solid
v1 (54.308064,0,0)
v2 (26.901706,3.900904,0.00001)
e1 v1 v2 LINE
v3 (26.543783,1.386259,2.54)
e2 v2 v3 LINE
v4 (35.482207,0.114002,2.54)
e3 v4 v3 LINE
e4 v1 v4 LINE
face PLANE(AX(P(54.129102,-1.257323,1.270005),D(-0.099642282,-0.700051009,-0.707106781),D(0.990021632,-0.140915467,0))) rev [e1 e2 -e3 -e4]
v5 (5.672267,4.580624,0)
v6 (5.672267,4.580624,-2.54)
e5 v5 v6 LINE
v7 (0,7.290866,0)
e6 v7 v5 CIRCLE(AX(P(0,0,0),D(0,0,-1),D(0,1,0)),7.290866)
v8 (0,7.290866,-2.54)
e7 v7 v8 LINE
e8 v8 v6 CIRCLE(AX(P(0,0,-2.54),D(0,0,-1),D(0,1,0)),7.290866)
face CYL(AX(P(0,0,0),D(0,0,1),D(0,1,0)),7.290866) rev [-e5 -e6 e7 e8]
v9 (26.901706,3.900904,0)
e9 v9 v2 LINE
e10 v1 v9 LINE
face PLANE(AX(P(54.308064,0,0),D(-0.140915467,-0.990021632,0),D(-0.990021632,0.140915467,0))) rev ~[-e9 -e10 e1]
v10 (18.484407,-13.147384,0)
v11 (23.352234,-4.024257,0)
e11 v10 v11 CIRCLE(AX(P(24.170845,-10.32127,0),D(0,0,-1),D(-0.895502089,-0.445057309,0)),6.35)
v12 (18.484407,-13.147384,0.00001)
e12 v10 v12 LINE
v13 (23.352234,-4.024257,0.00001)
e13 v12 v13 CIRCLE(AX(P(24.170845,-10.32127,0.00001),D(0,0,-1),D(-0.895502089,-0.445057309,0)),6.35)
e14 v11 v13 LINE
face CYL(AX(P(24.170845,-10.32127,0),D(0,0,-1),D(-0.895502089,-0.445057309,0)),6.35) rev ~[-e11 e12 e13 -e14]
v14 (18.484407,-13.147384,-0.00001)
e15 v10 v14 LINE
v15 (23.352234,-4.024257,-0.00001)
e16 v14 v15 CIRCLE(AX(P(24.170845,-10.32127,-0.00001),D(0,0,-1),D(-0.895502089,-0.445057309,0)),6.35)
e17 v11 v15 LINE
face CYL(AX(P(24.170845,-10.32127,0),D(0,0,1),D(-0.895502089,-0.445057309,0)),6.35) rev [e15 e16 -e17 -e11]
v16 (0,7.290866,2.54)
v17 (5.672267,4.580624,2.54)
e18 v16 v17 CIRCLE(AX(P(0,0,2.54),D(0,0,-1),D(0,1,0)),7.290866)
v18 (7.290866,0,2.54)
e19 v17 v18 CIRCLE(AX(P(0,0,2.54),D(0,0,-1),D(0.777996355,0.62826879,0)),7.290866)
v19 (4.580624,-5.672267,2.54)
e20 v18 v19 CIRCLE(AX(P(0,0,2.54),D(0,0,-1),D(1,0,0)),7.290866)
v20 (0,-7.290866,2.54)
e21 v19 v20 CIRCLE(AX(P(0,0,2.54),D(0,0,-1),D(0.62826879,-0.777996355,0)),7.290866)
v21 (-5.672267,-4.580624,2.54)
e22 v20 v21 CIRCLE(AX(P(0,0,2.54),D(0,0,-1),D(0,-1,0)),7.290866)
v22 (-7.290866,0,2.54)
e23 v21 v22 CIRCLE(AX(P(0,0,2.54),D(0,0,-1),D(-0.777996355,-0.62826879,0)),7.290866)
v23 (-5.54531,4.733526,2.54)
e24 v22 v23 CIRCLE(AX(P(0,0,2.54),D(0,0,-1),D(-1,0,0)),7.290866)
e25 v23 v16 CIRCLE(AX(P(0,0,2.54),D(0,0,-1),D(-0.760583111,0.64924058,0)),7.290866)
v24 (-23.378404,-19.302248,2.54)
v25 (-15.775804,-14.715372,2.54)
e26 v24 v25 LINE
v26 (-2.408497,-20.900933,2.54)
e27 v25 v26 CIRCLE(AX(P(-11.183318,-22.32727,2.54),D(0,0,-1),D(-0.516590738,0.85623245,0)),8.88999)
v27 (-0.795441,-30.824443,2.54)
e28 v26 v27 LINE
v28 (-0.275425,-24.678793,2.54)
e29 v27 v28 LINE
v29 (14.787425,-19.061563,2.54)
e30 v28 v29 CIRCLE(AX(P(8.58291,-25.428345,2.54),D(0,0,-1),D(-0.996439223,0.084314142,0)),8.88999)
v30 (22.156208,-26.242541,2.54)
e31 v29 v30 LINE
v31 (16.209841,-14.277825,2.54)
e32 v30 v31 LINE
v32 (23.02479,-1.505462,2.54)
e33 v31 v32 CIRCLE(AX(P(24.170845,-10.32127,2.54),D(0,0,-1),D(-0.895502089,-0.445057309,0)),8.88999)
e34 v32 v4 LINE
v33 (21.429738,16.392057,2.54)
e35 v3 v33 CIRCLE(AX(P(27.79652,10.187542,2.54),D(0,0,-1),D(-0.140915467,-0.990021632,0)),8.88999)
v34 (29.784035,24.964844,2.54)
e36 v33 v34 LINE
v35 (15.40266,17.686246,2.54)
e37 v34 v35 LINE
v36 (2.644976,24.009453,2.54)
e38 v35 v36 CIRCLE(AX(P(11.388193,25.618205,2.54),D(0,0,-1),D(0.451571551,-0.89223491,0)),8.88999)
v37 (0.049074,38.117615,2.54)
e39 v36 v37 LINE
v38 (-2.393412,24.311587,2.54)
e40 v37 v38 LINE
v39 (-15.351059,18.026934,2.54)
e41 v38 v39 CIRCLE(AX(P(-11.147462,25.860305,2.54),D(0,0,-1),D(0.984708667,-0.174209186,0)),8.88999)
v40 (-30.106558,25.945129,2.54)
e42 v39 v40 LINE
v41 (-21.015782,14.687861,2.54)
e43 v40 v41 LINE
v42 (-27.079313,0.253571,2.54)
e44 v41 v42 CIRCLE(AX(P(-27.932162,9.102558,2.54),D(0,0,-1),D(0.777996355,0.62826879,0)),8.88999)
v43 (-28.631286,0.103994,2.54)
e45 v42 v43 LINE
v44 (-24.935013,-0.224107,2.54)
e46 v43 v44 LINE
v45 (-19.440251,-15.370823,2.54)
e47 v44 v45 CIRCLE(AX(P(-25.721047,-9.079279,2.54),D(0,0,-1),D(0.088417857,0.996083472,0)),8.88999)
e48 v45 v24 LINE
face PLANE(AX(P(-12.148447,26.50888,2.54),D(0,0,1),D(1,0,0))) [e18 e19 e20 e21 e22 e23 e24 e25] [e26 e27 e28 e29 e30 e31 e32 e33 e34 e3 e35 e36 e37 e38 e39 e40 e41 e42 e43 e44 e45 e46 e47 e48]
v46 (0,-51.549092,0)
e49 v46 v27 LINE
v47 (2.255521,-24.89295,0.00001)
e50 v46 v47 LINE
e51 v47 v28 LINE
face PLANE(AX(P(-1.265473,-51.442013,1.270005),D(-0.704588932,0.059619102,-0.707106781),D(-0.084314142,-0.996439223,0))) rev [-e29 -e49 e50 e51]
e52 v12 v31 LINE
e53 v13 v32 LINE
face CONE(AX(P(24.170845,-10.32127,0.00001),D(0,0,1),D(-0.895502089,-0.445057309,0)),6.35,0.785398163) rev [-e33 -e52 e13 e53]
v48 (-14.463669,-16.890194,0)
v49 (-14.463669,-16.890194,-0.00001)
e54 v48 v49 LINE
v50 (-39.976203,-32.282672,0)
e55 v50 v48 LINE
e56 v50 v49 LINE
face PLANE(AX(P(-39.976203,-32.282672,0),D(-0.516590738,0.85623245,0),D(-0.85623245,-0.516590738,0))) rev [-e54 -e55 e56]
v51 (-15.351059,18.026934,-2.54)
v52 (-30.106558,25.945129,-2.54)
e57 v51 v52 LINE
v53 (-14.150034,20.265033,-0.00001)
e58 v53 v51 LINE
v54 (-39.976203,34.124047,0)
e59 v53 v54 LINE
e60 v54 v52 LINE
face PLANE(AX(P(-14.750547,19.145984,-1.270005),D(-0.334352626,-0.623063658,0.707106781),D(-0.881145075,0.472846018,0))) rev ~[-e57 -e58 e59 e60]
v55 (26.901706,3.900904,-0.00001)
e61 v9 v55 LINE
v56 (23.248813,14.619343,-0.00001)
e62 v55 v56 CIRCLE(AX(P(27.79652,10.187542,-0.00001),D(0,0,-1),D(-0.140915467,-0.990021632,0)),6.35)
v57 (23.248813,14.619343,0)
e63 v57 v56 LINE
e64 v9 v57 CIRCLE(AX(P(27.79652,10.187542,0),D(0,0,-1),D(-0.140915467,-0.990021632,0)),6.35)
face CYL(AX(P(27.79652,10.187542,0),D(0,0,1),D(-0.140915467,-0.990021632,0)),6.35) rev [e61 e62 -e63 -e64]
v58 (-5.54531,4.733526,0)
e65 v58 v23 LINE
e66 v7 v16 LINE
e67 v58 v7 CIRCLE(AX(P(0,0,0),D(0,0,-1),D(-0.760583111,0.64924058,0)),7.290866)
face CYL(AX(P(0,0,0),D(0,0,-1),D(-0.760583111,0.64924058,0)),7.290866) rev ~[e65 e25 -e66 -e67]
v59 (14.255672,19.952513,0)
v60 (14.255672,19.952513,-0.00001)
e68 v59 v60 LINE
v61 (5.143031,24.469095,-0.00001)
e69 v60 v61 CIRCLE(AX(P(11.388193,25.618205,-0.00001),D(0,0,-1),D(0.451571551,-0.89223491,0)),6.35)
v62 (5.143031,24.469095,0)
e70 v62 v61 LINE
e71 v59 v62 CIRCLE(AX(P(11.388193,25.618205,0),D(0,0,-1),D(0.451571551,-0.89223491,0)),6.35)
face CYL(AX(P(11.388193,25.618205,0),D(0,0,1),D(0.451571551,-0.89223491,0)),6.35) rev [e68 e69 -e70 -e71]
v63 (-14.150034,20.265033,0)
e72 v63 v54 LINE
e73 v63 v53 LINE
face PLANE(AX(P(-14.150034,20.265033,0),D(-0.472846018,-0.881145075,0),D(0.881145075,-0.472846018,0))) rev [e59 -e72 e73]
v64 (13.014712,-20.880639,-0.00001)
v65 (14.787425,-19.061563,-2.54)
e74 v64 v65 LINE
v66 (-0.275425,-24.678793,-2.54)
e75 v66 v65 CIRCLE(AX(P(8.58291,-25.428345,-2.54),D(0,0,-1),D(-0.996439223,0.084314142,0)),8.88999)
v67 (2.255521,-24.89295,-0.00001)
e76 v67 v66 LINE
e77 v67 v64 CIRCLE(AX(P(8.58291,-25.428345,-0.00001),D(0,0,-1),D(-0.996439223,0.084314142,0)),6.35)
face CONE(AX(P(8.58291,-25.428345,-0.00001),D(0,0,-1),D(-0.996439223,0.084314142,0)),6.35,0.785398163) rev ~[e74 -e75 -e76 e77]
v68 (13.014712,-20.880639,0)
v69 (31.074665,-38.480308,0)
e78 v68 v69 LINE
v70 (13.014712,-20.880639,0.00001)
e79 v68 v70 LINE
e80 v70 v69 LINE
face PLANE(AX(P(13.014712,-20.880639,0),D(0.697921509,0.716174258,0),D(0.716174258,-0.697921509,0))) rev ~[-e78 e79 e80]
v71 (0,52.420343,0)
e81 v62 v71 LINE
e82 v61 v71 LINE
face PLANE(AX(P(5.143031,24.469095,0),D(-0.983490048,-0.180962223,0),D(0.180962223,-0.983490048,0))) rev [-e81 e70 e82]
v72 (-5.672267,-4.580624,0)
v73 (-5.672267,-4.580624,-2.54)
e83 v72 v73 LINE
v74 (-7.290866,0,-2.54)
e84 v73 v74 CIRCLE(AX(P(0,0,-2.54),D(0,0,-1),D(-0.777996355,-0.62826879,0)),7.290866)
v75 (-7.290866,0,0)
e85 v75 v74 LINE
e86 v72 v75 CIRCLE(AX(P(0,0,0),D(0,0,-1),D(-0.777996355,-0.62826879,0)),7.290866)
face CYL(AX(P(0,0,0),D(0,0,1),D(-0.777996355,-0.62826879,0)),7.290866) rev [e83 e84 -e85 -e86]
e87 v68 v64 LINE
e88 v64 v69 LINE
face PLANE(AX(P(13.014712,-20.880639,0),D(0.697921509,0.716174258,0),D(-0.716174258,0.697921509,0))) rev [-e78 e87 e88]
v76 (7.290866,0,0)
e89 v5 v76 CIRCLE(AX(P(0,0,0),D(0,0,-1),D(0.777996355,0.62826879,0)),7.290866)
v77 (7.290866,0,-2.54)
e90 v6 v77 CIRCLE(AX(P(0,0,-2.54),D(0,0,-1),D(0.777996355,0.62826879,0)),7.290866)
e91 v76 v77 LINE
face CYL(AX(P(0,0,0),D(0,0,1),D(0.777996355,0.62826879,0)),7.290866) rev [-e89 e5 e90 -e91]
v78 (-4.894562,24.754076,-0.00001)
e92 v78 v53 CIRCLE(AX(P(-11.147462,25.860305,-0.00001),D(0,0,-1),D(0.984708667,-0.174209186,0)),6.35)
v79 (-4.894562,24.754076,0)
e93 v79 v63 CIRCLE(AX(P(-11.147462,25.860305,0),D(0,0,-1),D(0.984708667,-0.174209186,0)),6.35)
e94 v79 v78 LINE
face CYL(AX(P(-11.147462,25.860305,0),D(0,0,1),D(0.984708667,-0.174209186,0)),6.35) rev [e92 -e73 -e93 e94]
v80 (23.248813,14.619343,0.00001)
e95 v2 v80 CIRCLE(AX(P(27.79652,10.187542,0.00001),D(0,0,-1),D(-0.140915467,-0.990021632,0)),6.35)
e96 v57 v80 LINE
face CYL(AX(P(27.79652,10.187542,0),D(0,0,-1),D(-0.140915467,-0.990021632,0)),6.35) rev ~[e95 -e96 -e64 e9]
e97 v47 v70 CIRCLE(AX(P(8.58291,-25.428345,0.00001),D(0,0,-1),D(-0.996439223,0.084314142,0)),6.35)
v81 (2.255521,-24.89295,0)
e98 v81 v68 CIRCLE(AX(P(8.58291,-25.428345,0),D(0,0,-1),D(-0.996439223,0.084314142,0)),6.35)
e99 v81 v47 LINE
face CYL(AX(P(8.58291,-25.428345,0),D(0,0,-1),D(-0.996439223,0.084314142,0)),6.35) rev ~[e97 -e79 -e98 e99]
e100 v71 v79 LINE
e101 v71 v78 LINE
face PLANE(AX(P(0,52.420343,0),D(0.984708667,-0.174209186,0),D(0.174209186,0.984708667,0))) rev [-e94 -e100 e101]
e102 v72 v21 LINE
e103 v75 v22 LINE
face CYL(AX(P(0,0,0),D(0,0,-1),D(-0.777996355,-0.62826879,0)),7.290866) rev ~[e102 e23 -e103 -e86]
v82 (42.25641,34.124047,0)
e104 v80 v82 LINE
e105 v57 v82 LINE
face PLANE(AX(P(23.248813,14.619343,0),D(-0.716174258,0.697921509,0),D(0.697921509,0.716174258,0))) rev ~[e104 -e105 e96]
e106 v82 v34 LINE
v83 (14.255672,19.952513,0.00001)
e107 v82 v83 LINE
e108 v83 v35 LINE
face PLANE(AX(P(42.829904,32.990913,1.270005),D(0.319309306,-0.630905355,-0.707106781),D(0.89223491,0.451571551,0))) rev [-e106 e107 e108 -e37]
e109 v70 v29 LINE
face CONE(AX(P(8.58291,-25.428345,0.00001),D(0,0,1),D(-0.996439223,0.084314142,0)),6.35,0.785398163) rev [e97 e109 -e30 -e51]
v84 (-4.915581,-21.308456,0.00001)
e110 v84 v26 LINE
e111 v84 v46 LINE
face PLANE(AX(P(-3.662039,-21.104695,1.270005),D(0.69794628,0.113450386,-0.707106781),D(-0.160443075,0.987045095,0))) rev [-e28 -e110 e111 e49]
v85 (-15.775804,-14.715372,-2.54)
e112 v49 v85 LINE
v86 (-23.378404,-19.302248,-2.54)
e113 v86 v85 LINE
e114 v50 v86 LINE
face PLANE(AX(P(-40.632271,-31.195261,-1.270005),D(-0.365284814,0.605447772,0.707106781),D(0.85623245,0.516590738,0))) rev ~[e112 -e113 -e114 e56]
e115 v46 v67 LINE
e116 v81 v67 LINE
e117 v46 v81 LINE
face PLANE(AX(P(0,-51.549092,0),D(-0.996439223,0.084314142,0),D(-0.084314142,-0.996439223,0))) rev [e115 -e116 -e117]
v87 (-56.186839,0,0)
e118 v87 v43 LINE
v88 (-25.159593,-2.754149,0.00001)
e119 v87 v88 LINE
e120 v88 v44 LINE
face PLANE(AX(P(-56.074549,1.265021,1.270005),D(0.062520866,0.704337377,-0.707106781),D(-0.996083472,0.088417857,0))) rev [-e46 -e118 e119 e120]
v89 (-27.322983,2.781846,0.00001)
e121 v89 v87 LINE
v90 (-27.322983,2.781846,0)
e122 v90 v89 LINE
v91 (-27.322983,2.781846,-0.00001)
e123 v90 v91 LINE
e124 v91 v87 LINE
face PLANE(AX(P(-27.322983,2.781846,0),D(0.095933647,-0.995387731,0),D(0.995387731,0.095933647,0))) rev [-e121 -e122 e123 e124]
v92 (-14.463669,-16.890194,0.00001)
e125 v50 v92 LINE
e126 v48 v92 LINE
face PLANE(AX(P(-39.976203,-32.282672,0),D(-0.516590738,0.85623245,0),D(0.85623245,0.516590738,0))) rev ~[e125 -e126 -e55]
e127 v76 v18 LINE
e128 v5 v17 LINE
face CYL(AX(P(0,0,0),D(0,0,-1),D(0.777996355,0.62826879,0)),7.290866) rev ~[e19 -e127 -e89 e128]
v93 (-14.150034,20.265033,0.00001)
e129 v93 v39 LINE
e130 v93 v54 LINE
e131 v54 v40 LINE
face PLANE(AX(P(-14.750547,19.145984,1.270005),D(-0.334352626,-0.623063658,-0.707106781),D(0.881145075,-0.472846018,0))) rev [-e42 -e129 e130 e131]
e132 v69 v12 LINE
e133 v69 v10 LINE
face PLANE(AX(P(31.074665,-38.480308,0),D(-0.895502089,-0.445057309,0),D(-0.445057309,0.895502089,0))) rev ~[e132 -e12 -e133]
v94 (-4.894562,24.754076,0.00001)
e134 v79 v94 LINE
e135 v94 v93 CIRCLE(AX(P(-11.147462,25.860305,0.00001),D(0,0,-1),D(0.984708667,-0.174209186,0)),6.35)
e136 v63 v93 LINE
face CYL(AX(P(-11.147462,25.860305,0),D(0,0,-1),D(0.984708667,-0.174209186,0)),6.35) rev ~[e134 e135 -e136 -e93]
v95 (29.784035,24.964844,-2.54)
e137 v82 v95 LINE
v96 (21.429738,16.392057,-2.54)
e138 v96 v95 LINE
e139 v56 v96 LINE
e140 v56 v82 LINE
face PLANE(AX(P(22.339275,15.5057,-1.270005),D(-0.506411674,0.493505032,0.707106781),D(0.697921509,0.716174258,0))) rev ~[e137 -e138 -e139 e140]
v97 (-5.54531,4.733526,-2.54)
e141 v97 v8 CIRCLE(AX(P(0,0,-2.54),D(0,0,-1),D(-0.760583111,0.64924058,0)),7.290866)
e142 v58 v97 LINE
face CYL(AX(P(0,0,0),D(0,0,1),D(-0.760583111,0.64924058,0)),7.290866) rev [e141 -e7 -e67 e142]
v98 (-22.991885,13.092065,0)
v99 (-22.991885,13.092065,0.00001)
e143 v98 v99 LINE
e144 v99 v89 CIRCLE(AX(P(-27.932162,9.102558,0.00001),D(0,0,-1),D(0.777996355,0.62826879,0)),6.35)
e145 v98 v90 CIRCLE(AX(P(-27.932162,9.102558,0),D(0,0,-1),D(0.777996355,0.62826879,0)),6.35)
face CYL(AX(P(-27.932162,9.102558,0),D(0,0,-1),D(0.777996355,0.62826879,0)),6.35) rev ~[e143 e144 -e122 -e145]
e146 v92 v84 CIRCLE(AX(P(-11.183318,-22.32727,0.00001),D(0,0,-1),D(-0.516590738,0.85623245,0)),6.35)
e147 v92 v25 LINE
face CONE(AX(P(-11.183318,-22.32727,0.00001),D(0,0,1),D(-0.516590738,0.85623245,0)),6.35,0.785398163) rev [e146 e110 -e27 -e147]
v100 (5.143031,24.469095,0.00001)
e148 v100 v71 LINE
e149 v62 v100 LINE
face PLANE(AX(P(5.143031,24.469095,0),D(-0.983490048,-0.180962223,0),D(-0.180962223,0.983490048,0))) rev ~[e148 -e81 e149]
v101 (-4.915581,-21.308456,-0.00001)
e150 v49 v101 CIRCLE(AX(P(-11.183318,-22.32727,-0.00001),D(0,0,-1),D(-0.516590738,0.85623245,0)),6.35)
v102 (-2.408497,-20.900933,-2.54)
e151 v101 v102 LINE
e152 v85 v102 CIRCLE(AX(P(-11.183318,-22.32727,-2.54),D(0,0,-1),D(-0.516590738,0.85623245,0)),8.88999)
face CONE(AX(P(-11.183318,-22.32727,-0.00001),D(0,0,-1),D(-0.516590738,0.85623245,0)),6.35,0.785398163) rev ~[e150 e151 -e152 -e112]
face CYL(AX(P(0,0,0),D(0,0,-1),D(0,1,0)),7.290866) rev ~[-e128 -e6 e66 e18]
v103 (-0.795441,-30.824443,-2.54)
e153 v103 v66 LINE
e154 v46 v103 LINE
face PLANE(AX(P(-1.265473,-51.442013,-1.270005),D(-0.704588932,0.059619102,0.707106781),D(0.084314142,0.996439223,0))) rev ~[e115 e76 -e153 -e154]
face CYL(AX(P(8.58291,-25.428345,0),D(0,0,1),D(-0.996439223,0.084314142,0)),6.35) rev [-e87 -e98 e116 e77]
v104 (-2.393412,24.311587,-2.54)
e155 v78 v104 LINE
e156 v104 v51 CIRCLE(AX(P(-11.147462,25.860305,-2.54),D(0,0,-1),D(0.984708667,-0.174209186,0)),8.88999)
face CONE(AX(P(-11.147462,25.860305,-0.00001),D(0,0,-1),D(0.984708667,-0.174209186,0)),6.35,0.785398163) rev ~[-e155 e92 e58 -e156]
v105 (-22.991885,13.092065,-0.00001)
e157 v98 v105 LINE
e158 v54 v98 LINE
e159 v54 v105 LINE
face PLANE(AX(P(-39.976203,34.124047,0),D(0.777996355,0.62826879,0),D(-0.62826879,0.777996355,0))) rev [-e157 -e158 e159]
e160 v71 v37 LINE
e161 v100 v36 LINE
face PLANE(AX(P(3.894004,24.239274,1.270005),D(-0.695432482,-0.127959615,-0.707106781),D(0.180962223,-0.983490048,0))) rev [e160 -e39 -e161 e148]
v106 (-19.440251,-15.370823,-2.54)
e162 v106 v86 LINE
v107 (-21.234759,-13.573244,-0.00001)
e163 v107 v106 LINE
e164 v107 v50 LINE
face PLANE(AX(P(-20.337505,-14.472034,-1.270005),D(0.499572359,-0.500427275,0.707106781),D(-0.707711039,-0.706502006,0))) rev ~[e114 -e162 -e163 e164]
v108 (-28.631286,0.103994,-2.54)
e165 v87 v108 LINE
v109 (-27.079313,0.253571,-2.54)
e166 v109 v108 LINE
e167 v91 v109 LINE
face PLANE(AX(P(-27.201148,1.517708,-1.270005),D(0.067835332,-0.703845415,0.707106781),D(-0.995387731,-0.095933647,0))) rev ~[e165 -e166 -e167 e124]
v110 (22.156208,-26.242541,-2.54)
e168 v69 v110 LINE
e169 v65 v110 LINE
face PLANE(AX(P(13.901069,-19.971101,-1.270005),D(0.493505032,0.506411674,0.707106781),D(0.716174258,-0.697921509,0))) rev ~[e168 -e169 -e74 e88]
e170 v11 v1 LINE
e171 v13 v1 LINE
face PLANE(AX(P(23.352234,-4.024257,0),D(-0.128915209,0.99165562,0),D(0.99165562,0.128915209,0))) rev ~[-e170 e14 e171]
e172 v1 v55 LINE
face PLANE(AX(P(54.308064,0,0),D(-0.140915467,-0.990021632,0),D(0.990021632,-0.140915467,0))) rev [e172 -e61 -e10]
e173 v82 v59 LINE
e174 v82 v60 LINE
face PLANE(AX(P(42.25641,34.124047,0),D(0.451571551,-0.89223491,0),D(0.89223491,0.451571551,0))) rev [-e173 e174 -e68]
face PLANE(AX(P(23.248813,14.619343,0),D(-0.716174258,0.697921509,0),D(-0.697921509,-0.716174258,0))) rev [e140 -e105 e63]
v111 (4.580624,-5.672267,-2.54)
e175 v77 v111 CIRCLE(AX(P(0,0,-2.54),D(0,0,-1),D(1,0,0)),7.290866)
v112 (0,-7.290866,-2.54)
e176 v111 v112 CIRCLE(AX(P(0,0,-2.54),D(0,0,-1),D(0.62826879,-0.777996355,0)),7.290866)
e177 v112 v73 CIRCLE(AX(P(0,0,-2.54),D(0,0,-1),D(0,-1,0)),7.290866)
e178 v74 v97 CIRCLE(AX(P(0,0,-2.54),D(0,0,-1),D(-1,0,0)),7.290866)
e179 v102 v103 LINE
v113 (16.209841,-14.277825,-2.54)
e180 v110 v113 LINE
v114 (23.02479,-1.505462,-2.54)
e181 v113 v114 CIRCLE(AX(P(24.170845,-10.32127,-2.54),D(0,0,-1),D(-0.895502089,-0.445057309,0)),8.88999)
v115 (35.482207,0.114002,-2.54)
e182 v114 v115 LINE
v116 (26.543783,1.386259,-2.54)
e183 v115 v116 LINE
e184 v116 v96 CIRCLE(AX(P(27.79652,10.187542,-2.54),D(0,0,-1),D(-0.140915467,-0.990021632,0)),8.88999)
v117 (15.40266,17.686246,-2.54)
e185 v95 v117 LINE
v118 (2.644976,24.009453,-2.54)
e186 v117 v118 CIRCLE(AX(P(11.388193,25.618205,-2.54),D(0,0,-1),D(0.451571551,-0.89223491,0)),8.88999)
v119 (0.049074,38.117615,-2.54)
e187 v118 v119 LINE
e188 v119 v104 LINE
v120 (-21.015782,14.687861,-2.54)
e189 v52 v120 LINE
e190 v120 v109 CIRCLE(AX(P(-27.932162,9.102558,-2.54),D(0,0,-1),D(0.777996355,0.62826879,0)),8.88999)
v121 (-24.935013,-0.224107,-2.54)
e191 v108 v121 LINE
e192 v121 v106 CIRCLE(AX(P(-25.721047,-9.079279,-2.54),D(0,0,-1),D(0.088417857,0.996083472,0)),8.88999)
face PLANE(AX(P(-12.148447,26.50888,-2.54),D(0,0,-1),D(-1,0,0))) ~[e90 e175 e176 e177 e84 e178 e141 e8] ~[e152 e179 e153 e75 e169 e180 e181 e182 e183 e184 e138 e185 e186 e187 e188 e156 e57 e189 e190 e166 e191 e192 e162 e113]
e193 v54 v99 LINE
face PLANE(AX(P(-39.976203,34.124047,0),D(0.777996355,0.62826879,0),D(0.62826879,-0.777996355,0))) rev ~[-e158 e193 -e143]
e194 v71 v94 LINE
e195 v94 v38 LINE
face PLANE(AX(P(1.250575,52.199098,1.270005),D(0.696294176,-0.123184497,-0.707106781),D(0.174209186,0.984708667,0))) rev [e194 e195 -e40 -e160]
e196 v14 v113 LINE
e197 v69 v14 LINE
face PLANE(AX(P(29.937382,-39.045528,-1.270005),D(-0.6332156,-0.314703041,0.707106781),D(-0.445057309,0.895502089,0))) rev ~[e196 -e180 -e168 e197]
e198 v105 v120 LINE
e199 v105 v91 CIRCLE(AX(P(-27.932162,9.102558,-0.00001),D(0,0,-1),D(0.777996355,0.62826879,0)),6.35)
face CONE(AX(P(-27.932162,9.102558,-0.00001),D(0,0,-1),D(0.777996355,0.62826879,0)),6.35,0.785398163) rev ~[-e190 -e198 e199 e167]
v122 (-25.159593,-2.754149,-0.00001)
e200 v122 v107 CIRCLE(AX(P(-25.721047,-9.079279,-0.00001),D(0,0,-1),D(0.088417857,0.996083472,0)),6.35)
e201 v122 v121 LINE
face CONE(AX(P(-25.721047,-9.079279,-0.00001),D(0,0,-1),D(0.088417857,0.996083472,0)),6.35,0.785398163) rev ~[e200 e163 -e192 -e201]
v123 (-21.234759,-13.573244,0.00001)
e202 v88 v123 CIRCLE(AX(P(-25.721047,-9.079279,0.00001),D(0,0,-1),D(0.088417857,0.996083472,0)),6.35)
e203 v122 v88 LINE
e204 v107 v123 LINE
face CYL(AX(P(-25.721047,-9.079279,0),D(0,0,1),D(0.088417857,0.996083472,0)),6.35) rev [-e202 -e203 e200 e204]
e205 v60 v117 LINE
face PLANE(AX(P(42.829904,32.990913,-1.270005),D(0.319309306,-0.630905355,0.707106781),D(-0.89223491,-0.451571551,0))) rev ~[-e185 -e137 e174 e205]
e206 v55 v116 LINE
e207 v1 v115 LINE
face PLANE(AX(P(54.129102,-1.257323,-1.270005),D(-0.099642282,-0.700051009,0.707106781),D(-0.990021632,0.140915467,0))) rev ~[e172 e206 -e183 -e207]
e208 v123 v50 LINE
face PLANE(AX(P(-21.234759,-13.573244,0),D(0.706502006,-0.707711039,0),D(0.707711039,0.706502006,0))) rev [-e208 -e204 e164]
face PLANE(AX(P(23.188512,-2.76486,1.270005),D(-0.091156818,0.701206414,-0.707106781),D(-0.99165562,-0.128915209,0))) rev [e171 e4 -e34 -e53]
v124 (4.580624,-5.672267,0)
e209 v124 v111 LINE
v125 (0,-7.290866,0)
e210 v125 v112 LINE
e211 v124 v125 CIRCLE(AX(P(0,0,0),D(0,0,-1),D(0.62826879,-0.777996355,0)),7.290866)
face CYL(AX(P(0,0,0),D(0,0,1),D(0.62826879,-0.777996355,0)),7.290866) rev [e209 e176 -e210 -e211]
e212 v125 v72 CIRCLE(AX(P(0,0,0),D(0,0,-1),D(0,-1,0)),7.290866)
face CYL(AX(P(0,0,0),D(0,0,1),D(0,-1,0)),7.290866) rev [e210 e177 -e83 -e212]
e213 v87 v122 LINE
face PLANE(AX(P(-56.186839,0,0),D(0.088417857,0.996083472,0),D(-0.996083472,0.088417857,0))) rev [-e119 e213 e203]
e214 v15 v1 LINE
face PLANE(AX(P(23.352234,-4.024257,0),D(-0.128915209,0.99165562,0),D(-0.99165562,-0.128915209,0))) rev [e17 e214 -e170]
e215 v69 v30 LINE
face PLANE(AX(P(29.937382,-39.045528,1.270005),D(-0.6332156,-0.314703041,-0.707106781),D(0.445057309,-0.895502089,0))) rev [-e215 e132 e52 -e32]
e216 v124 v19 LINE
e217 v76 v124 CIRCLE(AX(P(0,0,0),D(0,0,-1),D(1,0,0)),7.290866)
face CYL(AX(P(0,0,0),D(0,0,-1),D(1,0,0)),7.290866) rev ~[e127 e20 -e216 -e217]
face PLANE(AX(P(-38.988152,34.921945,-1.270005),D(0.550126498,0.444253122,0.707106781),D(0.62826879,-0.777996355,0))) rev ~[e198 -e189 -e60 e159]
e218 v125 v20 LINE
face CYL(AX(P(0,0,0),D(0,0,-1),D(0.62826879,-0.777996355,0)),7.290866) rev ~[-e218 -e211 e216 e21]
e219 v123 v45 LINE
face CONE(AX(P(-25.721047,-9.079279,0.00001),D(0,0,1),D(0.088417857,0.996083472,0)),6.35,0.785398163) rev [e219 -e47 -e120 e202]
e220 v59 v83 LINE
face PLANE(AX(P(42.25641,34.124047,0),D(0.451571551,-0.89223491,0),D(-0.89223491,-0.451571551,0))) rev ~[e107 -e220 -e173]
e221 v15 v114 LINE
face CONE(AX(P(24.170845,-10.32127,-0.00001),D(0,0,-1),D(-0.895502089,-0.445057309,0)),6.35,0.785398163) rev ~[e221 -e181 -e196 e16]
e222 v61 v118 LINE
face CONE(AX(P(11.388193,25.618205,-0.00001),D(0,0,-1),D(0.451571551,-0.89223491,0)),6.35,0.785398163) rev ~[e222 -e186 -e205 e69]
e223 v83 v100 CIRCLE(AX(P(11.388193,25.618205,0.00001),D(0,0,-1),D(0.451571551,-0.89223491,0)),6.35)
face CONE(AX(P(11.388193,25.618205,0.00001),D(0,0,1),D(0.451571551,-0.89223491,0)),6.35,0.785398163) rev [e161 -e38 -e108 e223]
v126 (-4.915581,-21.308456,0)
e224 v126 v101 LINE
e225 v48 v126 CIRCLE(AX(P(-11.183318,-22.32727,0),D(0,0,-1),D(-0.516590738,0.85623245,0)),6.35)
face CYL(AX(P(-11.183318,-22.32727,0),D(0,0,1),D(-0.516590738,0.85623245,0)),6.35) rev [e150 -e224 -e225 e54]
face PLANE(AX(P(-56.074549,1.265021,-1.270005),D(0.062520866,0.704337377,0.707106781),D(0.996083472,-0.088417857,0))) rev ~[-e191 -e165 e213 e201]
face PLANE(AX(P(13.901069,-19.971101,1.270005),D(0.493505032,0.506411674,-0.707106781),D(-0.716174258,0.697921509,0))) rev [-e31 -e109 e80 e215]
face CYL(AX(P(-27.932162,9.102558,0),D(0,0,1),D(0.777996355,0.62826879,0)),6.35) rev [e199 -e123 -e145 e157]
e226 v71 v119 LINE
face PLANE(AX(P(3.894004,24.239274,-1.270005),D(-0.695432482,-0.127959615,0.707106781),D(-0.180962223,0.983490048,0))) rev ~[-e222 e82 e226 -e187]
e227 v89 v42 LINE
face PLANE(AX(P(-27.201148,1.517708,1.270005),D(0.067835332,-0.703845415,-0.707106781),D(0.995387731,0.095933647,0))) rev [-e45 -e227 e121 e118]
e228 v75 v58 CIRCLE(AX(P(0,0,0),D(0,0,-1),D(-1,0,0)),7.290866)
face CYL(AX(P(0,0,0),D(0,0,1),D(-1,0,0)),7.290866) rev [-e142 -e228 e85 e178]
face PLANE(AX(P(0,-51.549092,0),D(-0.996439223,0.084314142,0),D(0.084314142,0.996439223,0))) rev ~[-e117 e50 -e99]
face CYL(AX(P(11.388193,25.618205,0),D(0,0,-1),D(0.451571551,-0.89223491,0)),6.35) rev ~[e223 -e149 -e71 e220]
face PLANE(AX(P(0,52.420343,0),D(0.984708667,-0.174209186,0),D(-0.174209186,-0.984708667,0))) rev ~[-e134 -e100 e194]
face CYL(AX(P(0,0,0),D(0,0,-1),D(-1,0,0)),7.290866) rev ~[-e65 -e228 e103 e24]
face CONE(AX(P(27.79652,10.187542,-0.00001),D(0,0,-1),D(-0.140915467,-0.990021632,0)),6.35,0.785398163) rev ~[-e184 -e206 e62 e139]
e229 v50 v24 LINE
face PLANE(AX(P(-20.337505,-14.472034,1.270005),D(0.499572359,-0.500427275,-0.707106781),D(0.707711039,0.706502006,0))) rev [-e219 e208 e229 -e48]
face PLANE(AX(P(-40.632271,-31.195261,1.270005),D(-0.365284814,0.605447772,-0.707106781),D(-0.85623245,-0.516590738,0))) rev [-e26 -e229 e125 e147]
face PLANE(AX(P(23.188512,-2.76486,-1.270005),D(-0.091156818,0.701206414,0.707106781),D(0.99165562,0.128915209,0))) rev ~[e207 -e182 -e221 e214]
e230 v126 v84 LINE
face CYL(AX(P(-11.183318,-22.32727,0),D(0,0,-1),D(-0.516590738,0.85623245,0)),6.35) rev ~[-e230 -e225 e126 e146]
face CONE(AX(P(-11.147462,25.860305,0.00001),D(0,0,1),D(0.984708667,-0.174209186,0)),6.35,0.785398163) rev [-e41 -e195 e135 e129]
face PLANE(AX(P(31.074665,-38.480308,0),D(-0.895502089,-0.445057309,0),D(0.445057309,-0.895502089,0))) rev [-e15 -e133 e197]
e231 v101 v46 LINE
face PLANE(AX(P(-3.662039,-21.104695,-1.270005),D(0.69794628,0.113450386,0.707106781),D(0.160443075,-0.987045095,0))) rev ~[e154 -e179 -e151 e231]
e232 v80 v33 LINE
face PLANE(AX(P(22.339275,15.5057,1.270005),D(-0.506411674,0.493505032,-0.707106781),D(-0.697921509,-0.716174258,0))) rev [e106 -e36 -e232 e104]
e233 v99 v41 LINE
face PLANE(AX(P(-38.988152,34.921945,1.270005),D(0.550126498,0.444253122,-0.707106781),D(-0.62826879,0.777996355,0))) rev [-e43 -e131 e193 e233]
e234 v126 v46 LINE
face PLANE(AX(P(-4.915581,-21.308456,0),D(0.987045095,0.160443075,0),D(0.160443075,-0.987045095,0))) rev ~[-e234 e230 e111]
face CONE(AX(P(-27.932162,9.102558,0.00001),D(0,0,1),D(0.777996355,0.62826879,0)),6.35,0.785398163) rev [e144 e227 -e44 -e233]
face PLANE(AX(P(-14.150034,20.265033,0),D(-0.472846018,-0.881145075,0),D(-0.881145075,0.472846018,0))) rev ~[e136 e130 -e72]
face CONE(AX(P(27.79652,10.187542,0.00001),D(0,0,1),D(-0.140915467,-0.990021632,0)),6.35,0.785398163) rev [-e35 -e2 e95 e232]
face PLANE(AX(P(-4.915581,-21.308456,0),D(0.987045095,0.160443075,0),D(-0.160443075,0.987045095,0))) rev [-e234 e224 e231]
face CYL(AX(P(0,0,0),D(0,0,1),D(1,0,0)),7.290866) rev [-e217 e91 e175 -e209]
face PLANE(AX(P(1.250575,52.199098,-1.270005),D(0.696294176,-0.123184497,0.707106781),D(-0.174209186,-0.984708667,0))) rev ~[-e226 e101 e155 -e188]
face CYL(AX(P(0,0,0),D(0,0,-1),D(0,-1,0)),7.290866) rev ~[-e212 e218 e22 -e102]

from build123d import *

# Parameters (mm, degrees)
F1_DEPTH = 2.54
F2_SIZE  = 2.53999


# Not quite as in the source:
# - a fillet or chamfer is up to 0.001 mm smaller than in the source, because OpenCascade refuses the exact size


with BuildPart() as f1:
    # F0 (on Top) → F1 (new body)
    with BuildSketch(Plane.XY):
        with BuildLine():
            ThreePointArc((-5.5453096033, 4.7335261172), (-3.0532951973, 6.6207338367), (0, 7.2908660733))
            Line((0, 7.2908660733), (0, 52.4203432724))
            Line((0, 52.4203432724), (-4.8945622179, 24.7540763342))
            ThreePointArc((-4.8945622179, 24.7540763342), (-8.3763552073, 20.1468586178), (-14.1500344693, 20.2650334375))
            Line((-14.1500344693, 20.2650334375), (-39.9762034536, 34.1240465641))
            Line((-39.9762034536, 34.1240465641), (-5.5453096033, 4.7335261172))
        make_face()
        with BuildLine():
            Line((0, 52.4203432724), (0, 7.2908660733))
            ThreePointArc((0, 7.2908660733), (3.1432479122, 6.5785044395), (5.6722672278, 4.5806236032))
            Line((5.6722672278, 4.5806236032), (42.2564104309, 34.1240465641))
            Line((42.2564104309, 34.1240465641), (14.255672391, 19.9525133065))
            ThreePointArc((14.255672391, 19.9525133065), (8.5682529825, 19.9287025413), (5.1430312406, 24.46909487))
            Line((5.1430312406, 24.46909487), (0, 52.4203432724))
        make_face()
        with BuildLine():
            ThreePointArc((5.6722672278, 4.5806236032), (6.8743170129, 2.4290931856), (7.2908660733, 0))
            ThreePointArc((7.2908660733, 0), (6.5785044395, -3.1432479122), (4.5806236032, -5.6722672278))
            Line((4.5806236032, -5.6722672278), (31.0746654868, -38.4803079069))
            Line((31.0746654868, -38.4803079069), (18.4844070176, -13.1473843843))
            ThreePointArc((18.4844070176, -13.1473843843), (18.5684546903, -7.3320030677), (23.3522337103, -4.024257286))
            Line((23.3522337103, -4.024257286), (54.3080642819, 0))
            Line((54.3080642819, 0), (26.9017063995, 3.9009043758))
            ThreePointArc((26.9017063995, 3.9009043758), (21.7859881354, 8.139124947), (23.2488130784, 14.6193433195))
            Line((23.2488130784, 14.6193433195), (42.2564104309, 34.1240465641))
            Line((42.2564104309, 34.1240465641), (5.6722672278, 4.5806236032))
        make_face()
        with BuildLine():
            ThreePointArc((4.5806236032, -5.6722672278), (2.4290931856, -6.8743170129), (0, -7.2908660733))
            Line((0, -7.2908660733), (0, -51.5490919352))
            Line((0, -51.5490919352), (2.255521124, -24.8929502638))
            ThreePointArc((2.255521124, -24.8929502638), (6.3641325232, -19.4785950158), (13.0147117735, -20.8806385306))
            Line((13.0147117735, -20.8806385306), (31.0746654868, -38.4803079069))
            Line((31.0746654868, -38.4803079069), (4.5806236032, -5.6722672278))
        make_face()
        with BuildLine():
            Line((0, -51.5490919352), (0, -7.2908660733))
            ThreePointArc((0, -7.2908660733), (-3.1432479122, -6.5785044395), (-5.6722672278, -4.5806236032))
            Line((-5.6722672278, -4.5806236032), (-39.9762034536, -32.2826717697))
            Line((-39.9762034536, -32.2826717697), (-14.4636689781, -16.8901939339))
            ThreePointArc((-14.4636689781, -16.8901939339), (-8.5166009917, -16.5643608756), (-4.9155814374, -21.3084564677))
            Line((-4.9155814374, -21.3084564677), (0, -51.5490919352))
        make_face()
        with BuildLine():
            ThreePointArc((-5.6722672278, -4.5806236032), (-6.8743170129, -2.4290931856), (-7.2908660733, 0))
            Line((-7.2908660733, 0), (-13.3722843602, 0))
            Line((-13.3722843602, 0), (-56.1868394799, 0))
            Line((-56.1868394799, 0), (-25.1595931562, -2.7541493308))
            ThreePointArc((-25.1595931562, -2.7541493308), (-19.7516975402, -6.9137834915), (-21.2347588093, -13.5732444768))
            Line((-21.2347588093, -13.5732444768), (-39.9762034536, -32.2826717697))
            Line((-39.9762034536, -32.2826717697), (-5.6722672278, -4.5806236032))
        make_face()
        with BuildLine():
            Line((-13.3722843602, 0), (-7.2908660733, 0))
            ThreePointArc((-7.2908660733, 0), (-6.8405715313, 2.5225600534), (-5.5453096033, 4.7335261172))
            Line((-5.5453096033, 4.7335261172), (-39.9762034536, 34.1240465641))
            Line((-39.9762034536, 34.1240465641), (-22.9918849286, 13.0920645237))
            ThreePointArc((-22.9918849286, 13.0920645237), (-22.0777388727, 6.6432422744), (-27.3229831249, 2.7818456164))
            Line((-27.3229831249, 2.7818456164), (-56.1868394799, 0))
            Line((-56.1868394799, 0), (-13.3722843602, 0))
        make_face()
    extrude(amount=F1_DEPTH)

    # F2 (size 2.54 in the source; OpenCascade refuses exactly that, so slightly less here)
    f2_edges = [f1.edges().sort_by_distance(p)[0] for p in [
        (28.256041, 27.03828, 2.54),
        (40.604885, 1.950452, 2.54),
        (24.779536, -25.813846, 2.54),
        (22.044689, -29.680473, 2.54),
        (-2.447281, 38.58721, 2.54),
        (-31.484044, 23.608056, 2.54),
        (-30.605481, -22.927958, 2.54),
        (-2.457791, -36.428774, 2.54),
    ]]
    chamfer(f2_edges, length=F2_SIZE)

    # F3: F1 across plane


with BuildPart() as f1_1:
    add(f1.part)
    add(f1.part.mirror(Plane.XY))


solid = f1_1.part
